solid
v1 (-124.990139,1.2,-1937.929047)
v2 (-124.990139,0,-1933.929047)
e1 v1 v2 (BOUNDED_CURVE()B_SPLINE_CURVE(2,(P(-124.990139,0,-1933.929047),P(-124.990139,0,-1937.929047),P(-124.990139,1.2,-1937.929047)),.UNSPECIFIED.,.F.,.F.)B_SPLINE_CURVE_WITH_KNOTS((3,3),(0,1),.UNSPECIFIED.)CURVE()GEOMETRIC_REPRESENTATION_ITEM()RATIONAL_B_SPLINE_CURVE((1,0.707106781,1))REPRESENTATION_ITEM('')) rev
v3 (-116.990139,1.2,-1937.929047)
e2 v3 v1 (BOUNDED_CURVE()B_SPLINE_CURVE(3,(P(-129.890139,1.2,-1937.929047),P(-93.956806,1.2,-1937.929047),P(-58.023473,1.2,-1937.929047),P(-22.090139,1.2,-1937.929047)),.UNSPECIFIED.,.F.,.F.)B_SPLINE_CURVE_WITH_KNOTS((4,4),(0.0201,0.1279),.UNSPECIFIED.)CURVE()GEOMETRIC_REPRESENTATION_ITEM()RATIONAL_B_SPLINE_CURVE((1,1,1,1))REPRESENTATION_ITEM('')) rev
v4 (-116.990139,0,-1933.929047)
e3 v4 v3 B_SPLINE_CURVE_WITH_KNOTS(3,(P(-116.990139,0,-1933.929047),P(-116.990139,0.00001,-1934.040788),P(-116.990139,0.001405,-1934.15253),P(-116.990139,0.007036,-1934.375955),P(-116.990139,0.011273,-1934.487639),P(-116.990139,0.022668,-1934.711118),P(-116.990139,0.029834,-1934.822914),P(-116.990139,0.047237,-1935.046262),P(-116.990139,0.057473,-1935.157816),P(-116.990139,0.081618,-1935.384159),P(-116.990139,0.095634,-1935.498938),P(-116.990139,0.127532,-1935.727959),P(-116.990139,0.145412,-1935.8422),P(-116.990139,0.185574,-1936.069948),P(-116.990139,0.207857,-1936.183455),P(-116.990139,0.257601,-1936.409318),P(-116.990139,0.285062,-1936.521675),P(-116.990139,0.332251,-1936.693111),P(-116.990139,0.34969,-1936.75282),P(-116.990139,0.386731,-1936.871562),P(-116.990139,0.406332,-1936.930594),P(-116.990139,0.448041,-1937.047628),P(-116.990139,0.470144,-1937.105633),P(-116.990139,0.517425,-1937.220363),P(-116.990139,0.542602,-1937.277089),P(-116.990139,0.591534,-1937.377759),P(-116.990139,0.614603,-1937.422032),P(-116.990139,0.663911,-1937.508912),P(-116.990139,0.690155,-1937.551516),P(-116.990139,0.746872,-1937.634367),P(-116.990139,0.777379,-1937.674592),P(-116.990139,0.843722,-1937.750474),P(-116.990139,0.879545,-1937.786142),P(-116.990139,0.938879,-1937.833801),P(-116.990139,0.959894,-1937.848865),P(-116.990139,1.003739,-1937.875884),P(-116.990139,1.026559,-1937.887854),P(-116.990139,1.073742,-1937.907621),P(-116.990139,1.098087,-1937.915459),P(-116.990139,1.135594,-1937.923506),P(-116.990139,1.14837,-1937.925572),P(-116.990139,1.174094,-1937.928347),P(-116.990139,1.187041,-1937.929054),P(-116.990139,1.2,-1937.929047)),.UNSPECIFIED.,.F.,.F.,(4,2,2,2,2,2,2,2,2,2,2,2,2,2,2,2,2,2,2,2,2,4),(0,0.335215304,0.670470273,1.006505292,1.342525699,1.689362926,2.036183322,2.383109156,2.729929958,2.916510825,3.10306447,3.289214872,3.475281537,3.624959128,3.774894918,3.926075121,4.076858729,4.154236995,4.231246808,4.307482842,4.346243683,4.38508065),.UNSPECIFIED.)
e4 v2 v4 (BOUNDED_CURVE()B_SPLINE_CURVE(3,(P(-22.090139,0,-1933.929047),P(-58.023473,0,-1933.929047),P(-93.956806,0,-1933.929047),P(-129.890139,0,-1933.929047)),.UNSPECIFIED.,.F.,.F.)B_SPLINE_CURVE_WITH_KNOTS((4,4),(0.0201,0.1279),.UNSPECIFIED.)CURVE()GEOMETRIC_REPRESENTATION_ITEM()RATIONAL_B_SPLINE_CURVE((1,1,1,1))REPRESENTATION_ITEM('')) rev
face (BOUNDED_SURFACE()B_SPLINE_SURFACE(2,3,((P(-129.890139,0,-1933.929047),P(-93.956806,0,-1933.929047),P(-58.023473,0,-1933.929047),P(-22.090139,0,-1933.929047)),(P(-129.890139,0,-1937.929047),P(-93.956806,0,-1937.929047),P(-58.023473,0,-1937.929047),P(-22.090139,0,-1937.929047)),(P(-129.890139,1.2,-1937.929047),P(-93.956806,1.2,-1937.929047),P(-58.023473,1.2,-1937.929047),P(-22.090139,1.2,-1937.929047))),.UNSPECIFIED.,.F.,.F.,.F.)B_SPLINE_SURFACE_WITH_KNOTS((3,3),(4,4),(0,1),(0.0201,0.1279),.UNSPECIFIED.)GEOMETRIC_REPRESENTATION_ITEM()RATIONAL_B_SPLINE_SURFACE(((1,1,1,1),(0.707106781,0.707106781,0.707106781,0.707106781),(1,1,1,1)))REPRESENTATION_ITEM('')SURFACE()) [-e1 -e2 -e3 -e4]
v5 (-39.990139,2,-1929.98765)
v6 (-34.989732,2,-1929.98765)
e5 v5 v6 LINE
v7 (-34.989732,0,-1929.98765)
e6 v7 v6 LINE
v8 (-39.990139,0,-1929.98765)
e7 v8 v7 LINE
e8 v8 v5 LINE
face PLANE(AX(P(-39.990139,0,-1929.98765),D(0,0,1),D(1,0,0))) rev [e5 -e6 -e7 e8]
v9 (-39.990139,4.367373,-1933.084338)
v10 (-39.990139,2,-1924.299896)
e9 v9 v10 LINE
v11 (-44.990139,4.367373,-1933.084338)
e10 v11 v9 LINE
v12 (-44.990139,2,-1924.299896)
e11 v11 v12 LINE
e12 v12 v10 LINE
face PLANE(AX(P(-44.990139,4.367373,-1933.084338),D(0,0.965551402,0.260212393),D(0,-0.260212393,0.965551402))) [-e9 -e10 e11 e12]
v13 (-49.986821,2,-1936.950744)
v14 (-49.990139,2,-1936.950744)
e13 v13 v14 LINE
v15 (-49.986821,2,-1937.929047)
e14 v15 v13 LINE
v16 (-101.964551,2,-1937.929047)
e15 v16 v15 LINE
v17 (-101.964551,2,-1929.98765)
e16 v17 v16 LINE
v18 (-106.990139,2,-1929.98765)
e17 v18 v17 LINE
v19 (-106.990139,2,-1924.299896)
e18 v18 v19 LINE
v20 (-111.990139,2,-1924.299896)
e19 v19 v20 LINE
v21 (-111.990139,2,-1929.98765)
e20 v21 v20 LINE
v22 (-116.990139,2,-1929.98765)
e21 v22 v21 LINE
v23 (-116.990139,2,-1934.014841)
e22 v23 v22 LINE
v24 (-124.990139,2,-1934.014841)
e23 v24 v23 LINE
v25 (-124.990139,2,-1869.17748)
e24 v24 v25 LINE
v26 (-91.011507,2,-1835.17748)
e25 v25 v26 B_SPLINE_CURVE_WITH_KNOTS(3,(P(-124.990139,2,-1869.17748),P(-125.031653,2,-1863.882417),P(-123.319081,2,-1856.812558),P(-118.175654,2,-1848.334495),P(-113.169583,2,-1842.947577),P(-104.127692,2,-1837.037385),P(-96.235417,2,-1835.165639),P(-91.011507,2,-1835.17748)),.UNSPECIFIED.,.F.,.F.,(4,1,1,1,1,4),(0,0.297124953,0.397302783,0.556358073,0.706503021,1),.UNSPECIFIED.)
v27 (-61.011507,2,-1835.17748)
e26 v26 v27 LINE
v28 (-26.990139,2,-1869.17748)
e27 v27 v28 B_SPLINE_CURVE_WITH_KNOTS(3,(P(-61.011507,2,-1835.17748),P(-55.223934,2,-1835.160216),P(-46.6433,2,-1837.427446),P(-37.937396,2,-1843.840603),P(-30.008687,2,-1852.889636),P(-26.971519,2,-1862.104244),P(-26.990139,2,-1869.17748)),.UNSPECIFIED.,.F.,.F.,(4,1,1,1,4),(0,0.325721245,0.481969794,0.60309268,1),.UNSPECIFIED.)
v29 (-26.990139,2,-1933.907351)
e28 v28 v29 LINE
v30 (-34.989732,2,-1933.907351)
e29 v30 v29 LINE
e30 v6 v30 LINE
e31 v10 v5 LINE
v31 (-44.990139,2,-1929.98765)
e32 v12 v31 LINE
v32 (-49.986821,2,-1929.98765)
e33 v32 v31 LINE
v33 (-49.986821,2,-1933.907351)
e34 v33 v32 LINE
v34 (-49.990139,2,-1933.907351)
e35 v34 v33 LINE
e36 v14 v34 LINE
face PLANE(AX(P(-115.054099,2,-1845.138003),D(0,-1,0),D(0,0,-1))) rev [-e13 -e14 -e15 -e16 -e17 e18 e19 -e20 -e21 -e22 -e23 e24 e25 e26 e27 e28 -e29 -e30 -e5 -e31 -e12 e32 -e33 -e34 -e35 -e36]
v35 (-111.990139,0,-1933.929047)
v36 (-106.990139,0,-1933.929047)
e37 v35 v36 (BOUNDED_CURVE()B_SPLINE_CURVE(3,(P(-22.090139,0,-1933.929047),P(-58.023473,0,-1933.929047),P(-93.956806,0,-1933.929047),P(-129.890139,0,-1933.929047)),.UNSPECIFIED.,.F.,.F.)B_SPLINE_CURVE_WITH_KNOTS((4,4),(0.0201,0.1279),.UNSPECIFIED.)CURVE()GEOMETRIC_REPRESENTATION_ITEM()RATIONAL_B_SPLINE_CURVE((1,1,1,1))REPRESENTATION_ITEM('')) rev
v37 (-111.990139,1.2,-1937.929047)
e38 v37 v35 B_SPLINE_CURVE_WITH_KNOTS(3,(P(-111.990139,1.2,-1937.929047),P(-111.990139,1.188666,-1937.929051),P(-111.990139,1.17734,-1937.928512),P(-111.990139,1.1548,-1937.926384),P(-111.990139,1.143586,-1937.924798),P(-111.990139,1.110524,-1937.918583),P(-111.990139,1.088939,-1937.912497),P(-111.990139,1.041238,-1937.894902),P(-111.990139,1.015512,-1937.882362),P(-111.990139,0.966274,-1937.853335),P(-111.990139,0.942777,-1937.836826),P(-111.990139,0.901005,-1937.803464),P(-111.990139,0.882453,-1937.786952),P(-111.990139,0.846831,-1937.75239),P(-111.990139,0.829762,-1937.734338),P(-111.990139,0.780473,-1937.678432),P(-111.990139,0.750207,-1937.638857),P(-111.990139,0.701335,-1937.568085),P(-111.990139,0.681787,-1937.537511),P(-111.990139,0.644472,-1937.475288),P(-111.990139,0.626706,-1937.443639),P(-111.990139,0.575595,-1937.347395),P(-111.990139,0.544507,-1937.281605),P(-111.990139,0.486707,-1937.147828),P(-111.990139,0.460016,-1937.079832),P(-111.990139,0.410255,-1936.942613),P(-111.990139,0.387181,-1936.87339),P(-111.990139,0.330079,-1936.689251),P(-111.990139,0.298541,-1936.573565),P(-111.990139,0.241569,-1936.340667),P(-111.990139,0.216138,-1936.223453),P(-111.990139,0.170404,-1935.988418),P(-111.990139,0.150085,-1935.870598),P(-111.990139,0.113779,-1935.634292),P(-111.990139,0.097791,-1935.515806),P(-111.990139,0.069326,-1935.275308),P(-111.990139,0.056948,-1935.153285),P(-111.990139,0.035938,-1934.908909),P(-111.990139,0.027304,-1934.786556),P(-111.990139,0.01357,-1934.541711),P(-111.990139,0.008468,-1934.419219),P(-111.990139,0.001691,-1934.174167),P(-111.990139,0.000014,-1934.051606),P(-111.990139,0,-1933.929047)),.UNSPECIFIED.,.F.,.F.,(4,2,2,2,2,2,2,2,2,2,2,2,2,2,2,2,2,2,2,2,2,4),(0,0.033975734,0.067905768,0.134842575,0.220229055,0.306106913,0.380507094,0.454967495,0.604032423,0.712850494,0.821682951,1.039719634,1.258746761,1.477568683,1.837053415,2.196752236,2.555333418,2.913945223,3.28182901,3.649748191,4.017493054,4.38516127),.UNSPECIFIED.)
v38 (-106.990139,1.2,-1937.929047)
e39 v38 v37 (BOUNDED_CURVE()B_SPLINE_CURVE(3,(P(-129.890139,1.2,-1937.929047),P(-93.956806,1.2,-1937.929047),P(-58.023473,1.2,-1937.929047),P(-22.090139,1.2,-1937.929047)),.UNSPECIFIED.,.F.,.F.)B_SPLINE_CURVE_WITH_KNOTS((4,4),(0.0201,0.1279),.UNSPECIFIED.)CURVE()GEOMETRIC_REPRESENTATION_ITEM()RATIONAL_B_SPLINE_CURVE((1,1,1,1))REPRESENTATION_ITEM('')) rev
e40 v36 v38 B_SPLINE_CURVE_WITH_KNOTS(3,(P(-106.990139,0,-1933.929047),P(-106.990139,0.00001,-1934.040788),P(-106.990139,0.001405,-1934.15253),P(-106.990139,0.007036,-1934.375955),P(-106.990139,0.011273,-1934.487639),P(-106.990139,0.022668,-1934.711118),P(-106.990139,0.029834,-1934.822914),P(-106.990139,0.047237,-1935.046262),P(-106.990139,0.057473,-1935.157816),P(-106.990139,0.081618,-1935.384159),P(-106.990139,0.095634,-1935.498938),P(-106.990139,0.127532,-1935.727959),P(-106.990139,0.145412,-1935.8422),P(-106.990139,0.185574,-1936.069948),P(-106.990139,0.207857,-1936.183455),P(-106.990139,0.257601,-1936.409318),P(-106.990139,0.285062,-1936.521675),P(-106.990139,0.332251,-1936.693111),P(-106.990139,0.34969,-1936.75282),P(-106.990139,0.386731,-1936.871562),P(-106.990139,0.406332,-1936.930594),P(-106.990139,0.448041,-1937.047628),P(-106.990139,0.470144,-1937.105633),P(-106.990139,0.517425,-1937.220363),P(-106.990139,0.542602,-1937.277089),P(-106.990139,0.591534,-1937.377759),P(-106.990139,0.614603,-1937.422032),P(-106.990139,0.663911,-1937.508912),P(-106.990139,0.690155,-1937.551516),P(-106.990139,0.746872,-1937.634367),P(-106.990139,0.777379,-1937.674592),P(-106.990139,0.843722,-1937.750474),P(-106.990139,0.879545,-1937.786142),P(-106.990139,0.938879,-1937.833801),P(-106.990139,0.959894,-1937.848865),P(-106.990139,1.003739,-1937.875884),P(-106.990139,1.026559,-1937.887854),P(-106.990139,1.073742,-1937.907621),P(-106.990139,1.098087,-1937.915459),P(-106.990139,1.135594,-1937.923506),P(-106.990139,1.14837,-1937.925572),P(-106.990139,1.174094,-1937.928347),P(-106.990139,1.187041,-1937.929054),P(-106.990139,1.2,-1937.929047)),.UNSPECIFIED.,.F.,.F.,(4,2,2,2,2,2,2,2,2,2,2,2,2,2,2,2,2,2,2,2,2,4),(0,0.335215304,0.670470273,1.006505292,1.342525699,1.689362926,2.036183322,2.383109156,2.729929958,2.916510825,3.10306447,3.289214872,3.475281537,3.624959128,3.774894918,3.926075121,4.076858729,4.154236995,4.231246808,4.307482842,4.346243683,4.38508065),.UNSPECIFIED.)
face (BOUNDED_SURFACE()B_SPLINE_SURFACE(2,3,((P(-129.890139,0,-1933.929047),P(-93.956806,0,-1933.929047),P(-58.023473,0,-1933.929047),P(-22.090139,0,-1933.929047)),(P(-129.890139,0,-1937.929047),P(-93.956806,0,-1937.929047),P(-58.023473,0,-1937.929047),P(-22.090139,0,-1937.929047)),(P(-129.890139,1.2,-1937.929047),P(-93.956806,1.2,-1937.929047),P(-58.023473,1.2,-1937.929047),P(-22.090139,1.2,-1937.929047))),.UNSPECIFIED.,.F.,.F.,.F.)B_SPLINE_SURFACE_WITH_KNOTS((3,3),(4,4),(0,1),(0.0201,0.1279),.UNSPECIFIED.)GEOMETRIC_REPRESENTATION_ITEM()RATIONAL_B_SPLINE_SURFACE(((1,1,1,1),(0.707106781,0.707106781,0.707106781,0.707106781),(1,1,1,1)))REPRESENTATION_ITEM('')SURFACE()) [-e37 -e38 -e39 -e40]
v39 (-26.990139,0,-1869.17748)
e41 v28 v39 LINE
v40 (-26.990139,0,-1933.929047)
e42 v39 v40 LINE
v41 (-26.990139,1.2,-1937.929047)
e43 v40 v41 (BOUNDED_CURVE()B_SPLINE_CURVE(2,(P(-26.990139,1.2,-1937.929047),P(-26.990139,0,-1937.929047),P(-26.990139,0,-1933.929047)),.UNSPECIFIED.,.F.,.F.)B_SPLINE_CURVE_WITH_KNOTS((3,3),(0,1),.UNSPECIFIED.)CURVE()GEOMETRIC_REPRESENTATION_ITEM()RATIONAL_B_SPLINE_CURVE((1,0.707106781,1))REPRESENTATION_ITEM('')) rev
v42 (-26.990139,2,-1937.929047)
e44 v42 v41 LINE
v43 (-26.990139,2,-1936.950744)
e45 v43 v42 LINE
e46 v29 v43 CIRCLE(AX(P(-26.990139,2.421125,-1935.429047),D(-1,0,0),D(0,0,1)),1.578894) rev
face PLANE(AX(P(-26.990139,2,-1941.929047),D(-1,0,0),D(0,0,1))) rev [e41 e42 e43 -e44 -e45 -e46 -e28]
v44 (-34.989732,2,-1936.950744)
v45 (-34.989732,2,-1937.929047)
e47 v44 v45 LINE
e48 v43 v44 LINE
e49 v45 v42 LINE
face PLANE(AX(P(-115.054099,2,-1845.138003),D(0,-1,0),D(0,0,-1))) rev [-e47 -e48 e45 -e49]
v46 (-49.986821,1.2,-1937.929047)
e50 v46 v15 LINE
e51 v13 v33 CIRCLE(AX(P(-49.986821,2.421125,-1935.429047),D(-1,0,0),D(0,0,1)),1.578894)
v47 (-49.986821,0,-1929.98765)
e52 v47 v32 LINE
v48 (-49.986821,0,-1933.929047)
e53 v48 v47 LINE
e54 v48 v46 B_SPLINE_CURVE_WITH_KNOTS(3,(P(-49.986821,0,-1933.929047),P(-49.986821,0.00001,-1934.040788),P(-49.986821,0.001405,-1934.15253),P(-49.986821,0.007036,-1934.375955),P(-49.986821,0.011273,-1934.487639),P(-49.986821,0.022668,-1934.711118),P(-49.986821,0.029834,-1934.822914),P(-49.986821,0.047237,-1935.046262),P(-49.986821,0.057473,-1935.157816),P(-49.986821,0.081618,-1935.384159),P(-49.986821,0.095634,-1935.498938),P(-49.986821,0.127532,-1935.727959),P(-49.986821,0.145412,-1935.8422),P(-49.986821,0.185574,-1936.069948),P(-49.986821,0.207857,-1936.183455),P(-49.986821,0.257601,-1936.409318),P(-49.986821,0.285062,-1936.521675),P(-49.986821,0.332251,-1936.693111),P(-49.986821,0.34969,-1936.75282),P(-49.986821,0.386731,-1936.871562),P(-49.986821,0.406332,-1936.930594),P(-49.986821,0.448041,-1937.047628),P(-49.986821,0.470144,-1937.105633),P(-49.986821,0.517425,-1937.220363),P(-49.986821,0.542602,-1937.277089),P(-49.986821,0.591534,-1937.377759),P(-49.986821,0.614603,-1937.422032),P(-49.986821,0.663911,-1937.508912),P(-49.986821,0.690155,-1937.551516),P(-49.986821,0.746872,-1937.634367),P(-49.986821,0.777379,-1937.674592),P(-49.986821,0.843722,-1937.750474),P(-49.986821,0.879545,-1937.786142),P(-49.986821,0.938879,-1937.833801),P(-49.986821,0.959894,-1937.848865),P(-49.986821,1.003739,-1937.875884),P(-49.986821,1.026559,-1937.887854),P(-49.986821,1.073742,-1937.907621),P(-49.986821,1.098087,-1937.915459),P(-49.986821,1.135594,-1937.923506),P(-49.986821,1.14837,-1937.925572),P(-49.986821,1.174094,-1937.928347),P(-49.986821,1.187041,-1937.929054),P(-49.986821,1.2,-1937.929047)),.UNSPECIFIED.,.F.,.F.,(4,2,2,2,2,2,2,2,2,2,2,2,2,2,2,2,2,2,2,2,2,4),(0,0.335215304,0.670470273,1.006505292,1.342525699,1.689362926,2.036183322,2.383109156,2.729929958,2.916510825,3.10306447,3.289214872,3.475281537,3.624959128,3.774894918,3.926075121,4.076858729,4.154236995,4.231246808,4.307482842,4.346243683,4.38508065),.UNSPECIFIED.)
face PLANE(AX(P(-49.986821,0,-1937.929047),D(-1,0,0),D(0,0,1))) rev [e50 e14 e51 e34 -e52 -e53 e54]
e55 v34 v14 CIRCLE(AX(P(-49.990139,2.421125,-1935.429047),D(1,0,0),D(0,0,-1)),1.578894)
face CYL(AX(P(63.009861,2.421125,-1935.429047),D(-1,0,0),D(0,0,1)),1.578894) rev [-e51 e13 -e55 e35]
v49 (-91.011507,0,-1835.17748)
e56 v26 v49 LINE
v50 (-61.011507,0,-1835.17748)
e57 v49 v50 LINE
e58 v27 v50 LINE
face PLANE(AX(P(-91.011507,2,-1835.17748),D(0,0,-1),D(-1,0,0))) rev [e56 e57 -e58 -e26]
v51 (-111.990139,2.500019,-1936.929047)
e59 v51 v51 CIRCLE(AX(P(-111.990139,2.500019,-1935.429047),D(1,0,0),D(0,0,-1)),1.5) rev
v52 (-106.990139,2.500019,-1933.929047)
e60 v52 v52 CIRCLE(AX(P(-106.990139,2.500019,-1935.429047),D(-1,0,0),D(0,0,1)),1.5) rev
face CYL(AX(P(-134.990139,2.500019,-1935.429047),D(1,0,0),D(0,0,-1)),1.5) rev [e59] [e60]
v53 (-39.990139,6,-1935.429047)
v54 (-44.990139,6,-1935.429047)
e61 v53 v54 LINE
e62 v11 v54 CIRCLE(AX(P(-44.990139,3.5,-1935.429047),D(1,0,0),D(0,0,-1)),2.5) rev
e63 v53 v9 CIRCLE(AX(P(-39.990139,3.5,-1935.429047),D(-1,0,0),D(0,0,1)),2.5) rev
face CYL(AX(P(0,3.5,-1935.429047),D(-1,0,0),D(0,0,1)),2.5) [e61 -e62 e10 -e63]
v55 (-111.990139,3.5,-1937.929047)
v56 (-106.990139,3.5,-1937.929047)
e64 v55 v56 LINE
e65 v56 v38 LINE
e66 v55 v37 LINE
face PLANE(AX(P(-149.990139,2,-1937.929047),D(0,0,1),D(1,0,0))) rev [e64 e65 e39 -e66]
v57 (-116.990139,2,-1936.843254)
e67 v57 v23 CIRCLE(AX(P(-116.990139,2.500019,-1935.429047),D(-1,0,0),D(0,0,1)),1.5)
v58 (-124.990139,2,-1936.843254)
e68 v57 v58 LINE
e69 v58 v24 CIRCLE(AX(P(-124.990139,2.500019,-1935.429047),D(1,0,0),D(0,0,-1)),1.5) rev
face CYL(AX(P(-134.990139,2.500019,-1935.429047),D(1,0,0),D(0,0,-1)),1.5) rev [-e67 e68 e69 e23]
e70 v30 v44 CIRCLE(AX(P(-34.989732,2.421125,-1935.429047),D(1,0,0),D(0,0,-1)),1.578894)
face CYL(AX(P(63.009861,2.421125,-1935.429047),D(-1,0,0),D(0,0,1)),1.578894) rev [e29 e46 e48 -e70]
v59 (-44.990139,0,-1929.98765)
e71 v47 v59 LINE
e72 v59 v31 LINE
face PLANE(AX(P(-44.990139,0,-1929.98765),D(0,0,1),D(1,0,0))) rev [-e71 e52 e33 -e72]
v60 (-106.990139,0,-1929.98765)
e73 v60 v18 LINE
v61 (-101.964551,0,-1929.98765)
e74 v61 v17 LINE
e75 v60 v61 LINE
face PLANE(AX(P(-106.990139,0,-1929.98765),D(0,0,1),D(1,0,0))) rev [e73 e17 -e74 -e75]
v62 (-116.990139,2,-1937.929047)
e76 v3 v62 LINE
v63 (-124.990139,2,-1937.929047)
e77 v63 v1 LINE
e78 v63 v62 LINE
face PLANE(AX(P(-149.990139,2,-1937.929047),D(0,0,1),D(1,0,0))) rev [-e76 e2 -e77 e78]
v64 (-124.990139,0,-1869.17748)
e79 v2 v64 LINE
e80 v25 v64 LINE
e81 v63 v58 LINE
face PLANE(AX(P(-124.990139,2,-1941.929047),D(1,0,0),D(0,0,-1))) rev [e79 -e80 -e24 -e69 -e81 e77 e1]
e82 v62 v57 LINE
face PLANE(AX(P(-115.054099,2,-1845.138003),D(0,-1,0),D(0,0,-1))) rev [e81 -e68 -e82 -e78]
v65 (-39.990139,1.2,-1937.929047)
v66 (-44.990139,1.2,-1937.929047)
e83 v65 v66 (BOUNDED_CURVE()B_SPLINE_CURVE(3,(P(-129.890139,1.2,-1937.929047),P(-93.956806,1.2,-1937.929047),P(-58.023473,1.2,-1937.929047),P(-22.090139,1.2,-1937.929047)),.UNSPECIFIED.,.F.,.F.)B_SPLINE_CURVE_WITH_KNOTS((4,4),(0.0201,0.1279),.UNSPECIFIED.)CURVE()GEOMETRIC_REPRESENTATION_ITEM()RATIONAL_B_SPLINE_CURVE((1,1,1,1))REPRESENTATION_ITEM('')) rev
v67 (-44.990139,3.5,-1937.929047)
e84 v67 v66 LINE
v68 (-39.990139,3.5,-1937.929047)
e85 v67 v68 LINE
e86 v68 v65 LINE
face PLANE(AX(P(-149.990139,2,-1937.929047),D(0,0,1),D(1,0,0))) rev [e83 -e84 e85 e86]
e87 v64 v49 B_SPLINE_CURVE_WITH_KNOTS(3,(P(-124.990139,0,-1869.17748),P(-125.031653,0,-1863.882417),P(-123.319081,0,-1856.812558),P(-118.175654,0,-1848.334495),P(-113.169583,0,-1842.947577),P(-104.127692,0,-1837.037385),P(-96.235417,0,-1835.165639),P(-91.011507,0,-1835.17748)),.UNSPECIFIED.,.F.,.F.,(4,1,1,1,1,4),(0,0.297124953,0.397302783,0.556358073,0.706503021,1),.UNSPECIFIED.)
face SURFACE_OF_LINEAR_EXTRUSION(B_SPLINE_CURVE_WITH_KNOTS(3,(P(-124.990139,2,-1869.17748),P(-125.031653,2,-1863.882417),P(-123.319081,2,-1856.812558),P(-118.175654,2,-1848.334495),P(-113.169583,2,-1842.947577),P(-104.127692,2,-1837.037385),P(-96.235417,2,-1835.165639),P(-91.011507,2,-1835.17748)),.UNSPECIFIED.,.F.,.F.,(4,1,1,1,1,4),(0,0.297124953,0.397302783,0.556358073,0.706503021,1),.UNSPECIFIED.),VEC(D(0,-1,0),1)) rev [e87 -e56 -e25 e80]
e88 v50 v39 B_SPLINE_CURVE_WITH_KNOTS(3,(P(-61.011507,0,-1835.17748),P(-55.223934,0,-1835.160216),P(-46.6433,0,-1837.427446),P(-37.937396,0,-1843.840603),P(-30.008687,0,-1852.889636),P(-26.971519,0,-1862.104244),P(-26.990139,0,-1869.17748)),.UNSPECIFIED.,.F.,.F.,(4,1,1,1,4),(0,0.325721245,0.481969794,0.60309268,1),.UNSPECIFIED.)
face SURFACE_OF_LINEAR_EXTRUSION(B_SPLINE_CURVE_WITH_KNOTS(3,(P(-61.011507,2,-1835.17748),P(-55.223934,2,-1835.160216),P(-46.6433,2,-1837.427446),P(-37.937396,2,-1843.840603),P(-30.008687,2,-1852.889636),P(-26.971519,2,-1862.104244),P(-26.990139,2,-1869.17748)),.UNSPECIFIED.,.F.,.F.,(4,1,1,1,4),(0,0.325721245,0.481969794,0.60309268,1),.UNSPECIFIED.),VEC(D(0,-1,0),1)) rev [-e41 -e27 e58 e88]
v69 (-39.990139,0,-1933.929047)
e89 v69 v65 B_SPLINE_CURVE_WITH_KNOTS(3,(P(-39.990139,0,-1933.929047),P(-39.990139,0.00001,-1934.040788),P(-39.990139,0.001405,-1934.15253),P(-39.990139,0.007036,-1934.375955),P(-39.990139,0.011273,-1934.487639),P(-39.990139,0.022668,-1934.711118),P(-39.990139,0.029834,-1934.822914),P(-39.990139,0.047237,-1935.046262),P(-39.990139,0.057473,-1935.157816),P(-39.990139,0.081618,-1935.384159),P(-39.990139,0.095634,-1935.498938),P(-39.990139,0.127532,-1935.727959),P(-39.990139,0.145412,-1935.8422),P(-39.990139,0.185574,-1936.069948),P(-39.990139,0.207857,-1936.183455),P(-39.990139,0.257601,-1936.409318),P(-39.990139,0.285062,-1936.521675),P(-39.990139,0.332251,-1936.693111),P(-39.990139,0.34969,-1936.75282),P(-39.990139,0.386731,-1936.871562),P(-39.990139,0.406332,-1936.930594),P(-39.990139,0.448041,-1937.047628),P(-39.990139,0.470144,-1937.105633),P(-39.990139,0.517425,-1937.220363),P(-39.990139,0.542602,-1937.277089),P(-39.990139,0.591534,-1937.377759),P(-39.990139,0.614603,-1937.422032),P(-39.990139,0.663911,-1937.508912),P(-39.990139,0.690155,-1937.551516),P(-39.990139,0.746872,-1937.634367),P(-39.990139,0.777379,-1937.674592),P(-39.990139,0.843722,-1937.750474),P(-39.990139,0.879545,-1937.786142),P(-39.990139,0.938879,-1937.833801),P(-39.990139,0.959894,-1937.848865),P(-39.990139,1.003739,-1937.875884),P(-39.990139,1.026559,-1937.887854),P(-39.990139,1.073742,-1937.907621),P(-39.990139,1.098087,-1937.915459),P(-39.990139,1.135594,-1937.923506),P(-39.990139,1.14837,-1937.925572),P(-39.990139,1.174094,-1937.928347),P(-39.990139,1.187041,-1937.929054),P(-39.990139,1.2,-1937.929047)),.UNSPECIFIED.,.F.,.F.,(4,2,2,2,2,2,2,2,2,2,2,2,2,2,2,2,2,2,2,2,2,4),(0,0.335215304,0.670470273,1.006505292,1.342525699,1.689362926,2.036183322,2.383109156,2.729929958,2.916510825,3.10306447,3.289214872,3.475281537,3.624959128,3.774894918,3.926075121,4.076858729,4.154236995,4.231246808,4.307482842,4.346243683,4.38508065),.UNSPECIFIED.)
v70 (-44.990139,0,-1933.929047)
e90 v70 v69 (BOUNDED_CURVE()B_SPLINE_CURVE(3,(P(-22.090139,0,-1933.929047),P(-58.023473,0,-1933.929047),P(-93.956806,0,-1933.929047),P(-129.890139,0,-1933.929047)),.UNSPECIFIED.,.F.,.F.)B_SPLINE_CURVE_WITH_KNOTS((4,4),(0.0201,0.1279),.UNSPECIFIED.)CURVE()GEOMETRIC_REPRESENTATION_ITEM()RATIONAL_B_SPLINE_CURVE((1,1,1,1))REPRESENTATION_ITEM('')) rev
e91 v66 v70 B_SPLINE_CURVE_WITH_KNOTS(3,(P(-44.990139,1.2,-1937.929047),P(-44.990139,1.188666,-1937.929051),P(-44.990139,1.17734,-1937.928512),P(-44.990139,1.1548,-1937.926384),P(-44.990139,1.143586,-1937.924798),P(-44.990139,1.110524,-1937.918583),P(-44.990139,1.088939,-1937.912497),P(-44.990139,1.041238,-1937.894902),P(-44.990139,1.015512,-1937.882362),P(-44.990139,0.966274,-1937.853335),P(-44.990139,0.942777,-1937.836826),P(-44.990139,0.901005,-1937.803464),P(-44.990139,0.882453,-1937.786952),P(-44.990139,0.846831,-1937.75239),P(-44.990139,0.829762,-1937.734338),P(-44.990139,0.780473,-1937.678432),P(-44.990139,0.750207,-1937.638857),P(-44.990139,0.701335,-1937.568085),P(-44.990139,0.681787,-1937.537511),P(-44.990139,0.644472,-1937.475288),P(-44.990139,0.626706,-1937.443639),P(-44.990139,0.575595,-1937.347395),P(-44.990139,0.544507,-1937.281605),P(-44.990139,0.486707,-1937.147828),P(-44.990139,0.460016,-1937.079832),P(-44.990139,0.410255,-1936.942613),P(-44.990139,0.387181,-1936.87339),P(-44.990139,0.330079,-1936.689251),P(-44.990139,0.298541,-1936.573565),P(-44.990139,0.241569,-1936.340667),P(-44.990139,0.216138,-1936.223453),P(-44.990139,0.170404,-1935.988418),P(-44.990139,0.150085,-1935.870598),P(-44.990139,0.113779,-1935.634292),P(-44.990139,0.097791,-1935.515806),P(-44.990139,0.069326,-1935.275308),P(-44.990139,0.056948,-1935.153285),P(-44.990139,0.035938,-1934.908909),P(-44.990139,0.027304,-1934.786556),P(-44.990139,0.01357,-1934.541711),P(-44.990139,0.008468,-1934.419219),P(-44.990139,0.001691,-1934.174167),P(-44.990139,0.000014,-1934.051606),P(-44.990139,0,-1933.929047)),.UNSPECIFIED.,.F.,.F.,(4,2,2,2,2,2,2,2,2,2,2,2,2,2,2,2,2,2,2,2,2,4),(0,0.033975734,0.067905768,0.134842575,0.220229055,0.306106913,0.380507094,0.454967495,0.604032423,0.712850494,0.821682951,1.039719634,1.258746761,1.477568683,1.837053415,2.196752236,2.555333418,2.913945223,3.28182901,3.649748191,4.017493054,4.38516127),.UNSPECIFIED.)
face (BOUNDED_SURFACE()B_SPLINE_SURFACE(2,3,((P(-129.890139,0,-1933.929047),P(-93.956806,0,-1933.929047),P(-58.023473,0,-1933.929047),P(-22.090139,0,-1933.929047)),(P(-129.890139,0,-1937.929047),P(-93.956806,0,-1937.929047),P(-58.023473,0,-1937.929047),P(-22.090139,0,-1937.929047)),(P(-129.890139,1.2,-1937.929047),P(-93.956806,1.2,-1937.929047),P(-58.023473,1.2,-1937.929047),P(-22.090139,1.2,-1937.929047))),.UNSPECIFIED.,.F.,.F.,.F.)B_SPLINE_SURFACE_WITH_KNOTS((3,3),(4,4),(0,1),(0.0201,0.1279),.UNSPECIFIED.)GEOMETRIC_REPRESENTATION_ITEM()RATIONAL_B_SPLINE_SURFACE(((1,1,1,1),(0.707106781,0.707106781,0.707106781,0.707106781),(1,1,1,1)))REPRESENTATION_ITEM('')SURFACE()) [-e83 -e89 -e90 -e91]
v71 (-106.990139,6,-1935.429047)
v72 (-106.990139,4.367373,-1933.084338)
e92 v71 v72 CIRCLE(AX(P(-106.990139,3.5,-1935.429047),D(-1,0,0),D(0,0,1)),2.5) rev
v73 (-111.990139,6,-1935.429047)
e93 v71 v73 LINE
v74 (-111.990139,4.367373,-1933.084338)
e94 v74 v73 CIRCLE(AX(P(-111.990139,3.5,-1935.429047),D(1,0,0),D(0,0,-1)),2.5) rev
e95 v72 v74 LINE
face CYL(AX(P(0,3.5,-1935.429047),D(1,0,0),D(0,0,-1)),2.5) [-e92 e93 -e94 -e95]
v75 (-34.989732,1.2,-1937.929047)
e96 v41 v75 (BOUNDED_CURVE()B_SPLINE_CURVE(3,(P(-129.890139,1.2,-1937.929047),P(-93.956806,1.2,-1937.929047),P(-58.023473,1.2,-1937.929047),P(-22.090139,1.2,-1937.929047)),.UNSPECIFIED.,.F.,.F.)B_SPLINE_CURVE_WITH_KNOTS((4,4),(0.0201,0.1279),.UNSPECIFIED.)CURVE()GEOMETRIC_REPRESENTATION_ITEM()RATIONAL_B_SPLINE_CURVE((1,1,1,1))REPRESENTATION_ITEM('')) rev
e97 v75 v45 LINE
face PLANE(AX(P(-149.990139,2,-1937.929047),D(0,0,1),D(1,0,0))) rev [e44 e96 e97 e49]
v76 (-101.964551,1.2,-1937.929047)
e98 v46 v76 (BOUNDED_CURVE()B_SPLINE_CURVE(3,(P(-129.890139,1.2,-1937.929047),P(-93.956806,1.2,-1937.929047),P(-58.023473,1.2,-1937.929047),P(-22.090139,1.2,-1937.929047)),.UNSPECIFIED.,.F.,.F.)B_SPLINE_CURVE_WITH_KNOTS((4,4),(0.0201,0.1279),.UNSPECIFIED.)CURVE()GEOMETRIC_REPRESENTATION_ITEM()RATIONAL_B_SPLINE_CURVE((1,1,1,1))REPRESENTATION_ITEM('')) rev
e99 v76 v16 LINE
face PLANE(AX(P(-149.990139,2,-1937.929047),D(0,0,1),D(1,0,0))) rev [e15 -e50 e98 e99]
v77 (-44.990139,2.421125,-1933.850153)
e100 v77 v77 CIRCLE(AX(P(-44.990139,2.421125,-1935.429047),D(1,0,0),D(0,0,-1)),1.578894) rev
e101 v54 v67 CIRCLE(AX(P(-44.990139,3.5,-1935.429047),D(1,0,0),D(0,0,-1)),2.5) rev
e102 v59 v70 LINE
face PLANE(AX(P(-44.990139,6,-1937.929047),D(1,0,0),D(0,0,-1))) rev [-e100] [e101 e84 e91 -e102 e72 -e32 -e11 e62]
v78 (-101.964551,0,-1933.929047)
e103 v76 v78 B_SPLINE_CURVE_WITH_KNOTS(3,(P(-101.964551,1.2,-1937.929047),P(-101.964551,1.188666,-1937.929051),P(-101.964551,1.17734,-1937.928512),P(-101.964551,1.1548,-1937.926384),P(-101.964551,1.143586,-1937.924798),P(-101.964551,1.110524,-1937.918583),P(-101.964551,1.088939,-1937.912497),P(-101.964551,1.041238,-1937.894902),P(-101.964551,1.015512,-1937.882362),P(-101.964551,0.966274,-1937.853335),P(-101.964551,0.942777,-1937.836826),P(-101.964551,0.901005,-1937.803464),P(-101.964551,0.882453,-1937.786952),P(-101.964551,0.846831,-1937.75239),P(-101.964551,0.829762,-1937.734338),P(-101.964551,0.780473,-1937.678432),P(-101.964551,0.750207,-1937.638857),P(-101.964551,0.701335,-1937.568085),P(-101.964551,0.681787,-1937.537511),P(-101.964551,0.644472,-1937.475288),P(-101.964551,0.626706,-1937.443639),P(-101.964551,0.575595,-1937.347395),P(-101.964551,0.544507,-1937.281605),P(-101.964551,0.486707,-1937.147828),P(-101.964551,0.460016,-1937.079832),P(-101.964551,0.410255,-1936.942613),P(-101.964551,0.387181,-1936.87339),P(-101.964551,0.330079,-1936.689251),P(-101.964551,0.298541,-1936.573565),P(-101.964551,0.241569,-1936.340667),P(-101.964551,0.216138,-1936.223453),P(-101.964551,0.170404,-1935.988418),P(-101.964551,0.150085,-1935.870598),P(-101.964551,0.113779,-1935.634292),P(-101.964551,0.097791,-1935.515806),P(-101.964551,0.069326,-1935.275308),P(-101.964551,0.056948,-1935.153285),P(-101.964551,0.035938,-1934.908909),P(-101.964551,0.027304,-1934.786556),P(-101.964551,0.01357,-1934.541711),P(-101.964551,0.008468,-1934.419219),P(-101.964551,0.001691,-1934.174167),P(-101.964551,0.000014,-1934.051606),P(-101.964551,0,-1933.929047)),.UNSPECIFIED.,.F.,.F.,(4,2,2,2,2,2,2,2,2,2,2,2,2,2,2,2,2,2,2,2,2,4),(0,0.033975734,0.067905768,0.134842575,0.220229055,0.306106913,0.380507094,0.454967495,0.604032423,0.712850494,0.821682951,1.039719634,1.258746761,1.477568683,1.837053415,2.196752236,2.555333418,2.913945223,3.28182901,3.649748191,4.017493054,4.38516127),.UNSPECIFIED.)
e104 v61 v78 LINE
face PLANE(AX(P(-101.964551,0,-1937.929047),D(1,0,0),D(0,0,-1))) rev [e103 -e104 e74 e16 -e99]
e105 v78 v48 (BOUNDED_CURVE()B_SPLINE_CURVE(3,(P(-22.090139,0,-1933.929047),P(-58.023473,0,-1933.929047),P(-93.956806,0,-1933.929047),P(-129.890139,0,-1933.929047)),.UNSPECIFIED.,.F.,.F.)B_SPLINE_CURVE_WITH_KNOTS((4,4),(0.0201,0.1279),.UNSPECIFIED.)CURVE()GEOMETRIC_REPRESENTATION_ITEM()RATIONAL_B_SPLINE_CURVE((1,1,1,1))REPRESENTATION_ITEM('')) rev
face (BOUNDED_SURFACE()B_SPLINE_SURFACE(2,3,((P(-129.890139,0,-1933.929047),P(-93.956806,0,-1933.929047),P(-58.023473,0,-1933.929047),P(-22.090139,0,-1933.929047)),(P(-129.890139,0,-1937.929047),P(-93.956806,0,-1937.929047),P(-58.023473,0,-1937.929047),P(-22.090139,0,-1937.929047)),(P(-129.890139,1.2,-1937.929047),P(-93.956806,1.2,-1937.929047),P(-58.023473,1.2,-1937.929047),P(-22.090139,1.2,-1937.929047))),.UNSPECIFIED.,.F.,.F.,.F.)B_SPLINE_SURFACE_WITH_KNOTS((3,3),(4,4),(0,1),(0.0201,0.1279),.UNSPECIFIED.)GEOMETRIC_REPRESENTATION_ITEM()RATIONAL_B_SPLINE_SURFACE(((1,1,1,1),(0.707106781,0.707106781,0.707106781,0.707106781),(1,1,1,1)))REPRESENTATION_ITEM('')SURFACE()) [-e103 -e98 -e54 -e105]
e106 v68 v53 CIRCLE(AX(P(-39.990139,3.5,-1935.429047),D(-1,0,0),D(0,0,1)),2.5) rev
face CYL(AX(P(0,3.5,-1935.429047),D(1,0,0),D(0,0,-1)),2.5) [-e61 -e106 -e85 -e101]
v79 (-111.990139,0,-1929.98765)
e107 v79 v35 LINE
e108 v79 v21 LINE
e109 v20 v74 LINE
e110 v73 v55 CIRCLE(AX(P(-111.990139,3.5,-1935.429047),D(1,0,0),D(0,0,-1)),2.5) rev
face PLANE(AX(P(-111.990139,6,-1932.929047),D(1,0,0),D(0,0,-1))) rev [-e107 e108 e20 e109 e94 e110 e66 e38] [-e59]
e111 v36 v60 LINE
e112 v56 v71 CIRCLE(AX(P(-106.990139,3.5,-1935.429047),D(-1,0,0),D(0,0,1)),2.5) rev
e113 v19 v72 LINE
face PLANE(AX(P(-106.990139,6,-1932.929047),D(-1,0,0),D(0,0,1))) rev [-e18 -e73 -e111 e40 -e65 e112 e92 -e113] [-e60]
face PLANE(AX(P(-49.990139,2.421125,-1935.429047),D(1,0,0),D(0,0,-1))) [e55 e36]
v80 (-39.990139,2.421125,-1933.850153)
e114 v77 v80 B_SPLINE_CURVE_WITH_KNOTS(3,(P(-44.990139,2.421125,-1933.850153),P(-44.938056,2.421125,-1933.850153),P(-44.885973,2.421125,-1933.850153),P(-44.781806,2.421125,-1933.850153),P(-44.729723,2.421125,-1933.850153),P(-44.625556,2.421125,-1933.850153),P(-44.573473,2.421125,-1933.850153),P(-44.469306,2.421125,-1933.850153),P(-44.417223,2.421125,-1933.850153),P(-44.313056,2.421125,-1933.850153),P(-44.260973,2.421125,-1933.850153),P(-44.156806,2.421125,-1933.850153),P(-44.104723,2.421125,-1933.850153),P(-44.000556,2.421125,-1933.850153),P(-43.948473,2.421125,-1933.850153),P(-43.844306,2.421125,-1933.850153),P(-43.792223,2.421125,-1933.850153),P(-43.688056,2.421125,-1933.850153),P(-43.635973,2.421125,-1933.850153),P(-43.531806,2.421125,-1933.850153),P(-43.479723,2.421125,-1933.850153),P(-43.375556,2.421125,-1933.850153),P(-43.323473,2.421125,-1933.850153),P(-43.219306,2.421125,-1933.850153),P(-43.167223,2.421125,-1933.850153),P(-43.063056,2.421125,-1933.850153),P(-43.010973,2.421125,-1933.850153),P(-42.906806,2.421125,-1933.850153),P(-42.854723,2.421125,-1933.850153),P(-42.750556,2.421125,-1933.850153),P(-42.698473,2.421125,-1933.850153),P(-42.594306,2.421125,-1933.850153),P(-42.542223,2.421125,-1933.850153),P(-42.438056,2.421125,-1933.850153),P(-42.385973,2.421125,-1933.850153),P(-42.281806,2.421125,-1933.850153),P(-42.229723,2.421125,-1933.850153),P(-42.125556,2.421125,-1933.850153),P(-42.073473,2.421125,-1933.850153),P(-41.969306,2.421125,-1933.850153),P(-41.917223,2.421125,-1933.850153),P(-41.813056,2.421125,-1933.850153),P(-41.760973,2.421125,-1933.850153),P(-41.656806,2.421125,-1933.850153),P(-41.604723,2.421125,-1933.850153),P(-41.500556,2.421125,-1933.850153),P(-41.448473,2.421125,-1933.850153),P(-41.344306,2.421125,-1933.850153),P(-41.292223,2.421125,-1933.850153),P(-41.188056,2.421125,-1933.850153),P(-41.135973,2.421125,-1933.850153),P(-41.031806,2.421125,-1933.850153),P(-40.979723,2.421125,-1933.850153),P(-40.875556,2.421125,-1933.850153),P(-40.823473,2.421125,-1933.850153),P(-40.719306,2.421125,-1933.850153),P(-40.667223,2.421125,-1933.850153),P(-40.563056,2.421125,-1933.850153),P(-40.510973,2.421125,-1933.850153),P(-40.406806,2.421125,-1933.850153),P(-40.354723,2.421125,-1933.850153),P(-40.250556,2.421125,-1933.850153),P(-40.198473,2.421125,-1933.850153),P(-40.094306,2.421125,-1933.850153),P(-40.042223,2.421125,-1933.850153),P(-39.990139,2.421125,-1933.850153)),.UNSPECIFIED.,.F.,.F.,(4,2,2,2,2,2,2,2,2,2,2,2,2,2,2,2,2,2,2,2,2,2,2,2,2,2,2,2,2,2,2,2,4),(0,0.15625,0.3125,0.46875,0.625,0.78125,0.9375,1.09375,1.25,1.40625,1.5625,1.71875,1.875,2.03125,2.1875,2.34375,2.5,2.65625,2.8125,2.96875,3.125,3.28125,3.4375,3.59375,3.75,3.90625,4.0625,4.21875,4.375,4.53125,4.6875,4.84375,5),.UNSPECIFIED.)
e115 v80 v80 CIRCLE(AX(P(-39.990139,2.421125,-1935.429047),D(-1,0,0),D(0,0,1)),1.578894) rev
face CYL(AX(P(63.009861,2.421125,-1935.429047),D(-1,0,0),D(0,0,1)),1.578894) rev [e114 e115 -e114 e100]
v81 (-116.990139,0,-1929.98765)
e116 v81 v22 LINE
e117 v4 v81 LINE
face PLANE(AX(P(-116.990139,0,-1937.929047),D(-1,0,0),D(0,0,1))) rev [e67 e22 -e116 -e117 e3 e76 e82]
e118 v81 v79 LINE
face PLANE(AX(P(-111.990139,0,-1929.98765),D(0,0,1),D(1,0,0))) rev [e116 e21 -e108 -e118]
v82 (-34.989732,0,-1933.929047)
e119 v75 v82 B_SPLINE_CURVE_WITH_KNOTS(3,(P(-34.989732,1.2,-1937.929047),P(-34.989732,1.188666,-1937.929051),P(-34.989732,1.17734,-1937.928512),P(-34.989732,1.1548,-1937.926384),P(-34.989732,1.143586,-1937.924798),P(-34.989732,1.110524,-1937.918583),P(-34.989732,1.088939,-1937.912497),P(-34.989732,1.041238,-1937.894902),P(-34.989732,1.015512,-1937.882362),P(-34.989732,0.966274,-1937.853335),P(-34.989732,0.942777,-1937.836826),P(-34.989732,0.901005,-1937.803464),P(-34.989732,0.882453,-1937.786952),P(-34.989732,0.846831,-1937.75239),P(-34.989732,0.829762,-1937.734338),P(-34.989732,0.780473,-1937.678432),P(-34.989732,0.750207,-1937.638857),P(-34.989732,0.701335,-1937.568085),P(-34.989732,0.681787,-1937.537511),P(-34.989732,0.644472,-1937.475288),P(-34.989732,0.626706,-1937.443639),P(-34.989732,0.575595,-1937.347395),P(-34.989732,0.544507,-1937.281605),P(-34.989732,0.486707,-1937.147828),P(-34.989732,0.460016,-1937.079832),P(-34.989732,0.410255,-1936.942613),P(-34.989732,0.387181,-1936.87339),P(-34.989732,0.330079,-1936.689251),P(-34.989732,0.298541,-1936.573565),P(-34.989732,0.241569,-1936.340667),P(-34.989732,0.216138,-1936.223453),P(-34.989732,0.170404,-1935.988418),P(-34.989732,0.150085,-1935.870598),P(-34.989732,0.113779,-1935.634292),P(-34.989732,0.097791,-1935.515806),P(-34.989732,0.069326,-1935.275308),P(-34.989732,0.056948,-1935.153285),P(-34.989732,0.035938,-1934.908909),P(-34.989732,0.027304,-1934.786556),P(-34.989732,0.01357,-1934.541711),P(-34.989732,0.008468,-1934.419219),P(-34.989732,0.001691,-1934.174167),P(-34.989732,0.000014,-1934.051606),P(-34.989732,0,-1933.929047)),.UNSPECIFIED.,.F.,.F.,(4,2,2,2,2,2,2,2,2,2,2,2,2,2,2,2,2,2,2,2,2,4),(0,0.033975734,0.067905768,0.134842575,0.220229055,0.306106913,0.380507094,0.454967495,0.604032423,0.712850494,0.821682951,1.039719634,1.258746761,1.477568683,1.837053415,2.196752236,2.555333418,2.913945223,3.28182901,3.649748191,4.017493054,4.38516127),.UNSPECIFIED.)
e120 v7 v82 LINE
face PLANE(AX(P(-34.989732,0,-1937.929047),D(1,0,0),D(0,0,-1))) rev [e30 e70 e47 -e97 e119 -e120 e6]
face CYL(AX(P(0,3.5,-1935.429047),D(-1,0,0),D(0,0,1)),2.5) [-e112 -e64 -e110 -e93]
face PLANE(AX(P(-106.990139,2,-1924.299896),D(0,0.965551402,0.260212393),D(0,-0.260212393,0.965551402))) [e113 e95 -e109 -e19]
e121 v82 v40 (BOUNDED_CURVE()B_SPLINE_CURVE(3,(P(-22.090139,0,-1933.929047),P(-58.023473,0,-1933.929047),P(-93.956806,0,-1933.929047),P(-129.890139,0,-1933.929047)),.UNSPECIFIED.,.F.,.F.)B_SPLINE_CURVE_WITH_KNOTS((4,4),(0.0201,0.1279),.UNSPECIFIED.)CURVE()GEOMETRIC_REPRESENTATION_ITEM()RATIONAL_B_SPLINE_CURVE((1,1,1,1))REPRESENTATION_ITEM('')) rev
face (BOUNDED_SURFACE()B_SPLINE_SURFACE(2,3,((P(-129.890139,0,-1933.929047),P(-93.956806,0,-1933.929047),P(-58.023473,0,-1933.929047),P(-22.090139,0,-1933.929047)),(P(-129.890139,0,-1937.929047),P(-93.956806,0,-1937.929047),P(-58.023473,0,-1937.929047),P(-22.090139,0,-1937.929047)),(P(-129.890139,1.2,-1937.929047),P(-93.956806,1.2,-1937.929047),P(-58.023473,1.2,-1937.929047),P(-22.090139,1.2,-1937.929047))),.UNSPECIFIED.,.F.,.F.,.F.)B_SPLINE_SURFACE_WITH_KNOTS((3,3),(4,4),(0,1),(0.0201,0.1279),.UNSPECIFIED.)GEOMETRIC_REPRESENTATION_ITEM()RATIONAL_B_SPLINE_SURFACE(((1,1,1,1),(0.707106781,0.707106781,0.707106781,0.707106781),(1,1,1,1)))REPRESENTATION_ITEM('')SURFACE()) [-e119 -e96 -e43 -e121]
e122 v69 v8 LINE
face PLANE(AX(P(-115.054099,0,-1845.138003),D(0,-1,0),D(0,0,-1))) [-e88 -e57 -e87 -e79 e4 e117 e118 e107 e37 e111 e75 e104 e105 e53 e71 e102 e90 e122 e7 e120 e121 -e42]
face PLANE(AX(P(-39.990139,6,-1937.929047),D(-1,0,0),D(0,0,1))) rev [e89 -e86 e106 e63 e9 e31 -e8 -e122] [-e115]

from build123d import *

# Parameters (mm, degrees)
BOSS_EXTRUDE1_DEPTH     = 2
SKETCH5_W               = 4
SKETCH5_H               = 2
CUT_EXTRUDE3_DEPTH      = 123
FILLET3_SIZE            = 4
FILLET3_SIZE_2          = 1.2
SKETCH6_W               = 5
SKETCH6_H               = 5
BOSS_EXTRUDE3_DEPTH     = 4
FILLET4_R               = 2.5
CUT_EXTRUDE7_DEPTH      = 23
CUT_EXTRUDE7_DEPTH_BACK = 10
SKETCH7_R               = 1.5
CUT_EXTRUDE8_DEPTH      = 103
CUT_EXTRUDE8_DEPTH_BACK = 10
SKETCH8_R               = 1.578894268
SKETCH11_W              = 5
SKETCH11_H              = 7.941397329
SKETCH11_W_2            = 5.025588604
SKETCH11_W_3            = 4.996681142
SKETCH11_W_4            = 5.000407309
CUT_EXTRUDE10_DEPTH     = 2
BOSS_EXTRUDE9_DEPTH     = 5
BOSS_EXTRUDE10_DEPTH    = 5


# Some blends are built 0.0001 mm under size
with BuildPart() as part:
    # Sketch1 → Boss-Extrude1 (new body)
    with BuildSketch(Plane(origin=(0, 0, 0), x_dir=(1, 0, 0), z_dir=(0, 1, 0))):
        with BuildLine():
            Line((-124.990139359, 1941.929047201), (-26.990139359, 1941.929047201))
            Line((-26.990139359, 1941.929047201), (-26.990139359, 1869.177480284))
            add(Edge.make_bspline(
                [(-26.990139359, 1869.177480284), (-26.971518988, 1862.10424426), (-30.008687271, 1852.889636427), (-37.937395583, 1843.840603399), (-46.643299948, 1837.427446423), (-55.223933615, 1835.160216105), (-61.011506847, 1835.177480284)],
                knots=[0, 0, 0, 0, 0.39690732, 0.518030206, 0.674278755, 1, 1, 1, 1], degree=3))
            Line((-61.011506847, 1835.177480284), (-91.011506847, 1835.177480284))
            add(Edge.make_bspline(
                [(-124.990139359, 1869.177480284), (-125.031653114, 1863.882416947), (-123.319081347, 1856.812557982), (-118.175654079, 1848.334494738), (-113.169582942, 1842.947577461), (-104.127691798, 1837.037384536), (-96.235416895, 1835.16563891), (-91.011506847, 1835.177480284)],
                knots=[0, 0, 0, 0, 0.297124953, 0.397302783, 0.556358073, 0.706503021, 1, 1, 1, 1], degree=3))
            Line((-124.990139359, 1869.177480284), (-124.990139359, 1941.929047201))
        make_face()
    extrude(amount=BOSS_EXTRUDE1_DEPTH)

    # Sketch5 → Cut-Extrude3 (cut)
    with BuildSketch(Plane(origin=(-26.990139359, 0, 0), x_dir=(0, 0, -1), z_dir=(1, 0, 0))):
        with Locations((1939.929047201, 1)):
            Rectangle(SKETCH5_W, SKETCH5_H)
    extrude(amount=-CUT_EXTRUDE3_DEPTH, mode=Mode.SUBTRACT)

    # Fillet3
    # an asymmetric fillet: 4, 1.2 mm, written as the material it takes off along each edge
    with BuildSketch(Plane(origin=(-16.990139359, 0, -1937.929047201), x_dir=(0, 0, 1), z_dir=(-1, 0, 0))) as fillet3_piece_1:
        with BuildLine():
            Bezier((FILLET3_SIZE, 0), (0, 0), (0, FILLET3_SIZE_2), weights=[1, 0.707106781, 1])
            Line((0, FILLET3_SIZE_2), (0, 0))
            Line((0, 0), (FILLET3_SIZE, 0))
        make_face()
    extrude(amount=118, mode=Mode.SUBTRACT)

    # Sketch6 → Boss-Extrude3 (add)
    with BuildSketch(Plane(origin=(0, 2, 0), x_dir=(1, 0, 0), z_dir=(0, 1, 0))):
        with Locations((-42.490139359, 1935.429047201)):
            Rectangle(SKETCH6_W, SKETCH6_H)
        with Locations((-109.490139359, 1935.429047201)):
            Rectangle(SKETCH6_W, SKETCH6_H)
    extrude(amount=BOSS_EXTRUDE3_DEPTH)

    # Fillet4
    fillet4_edges = [part.edges().sort_by_distance(p)[0] for p in [
        (-42.490139359, 6, -1932.929047201),
        (-42.490139359, 6, -1937.929047201),
        (-109.490139359, 6, -1932.929047201),
        (-109.490139359, 6, -1937.929047201),
    ]]
    fillet(fillet4_edges, radius=FILLET4_R - 0.0001)  # a hair under: the kernel refuses the full size

    # Sketch7 → Cut-Extrude7 (cut, two sides: drawn at the far end of the back side and taken through both)
    with BuildSketch(Plane.ZY.offset(111.990139359).offset(-CUT_EXTRUDE7_DEPTH_BACK)):
        with Locations(Location((-1935.429047201, 2.500019457, 0), (0, 0, 199.472008932))):
            Circle(SKETCH7_R)
    extrude(amount=CUT_EXTRUDE7_DEPTH + CUT_EXTRUDE7_DEPTH_BACK, mode=Mode.SUBTRACT)

    # Sketch8 → Cut-Extrude8 (cut, two sides: drawn at the far end of the back side and taken through both)
    with BuildSketch(Plane(origin=(-39.990139359, 0, 0), x_dir=(0, 0, -1), z_dir=(1, 0, 0)).offset(-CUT_EXTRUDE8_DEPTH_BACK)):
        with Locations(Location((1935.429047201, 2.421125189, 0), (0, 0, 195.469275058))):
            Circle(SKETCH8_R)
    extrude(amount=CUT_EXTRUDE8_DEPTH + CUT_EXTRUDE8_DEPTH_BACK, mode=Mode.SUBTRACT)

    # Sketch11 → Cut-Extrude10 (cut)
    with BuildSketch(Plane(origin=(0, 2, 0), x_dir=(1, 0, 0), z_dir=(0, 1, 0))):
        with Locations((-114.490139359, 1933.958348537)):
            Rectangle(SKETCH11_W, SKETCH11_H)
        with Locations((-104.477345057, 1933.958348537)):
            Rectangle(SKETCH11_W_2, SKETCH11_H)
        with Locations((-47.48847993, 1933.958348537)):
            Rectangle(SKETCH11_W_3, SKETCH11_H)
        with Locations((-37.489935704, 1933.958348537)):
            Rectangle(SKETCH11_W_4, SKETCH11_H)
    extrude(amount=-CUT_EXTRUDE10_DEPTH, mode=Mode.SUBTRACT)

    # Sketch12 → Boss-Extrude9 (add)
    with BuildSketch(Plane.ZY.offset(111.990139359)):
        with BuildLine():
            Line((-1924.299895593, 2), (-1934.170448036, 4.660075958))
            add(Edge.make_bspline(
                [(-1934.170448036, 4.660075958), (-1933.941696195, 4.343587233), (-1933.419980381, 3.982722954), (-1933.044506849, 2.985103355), (-1932.921466188, 2.346520539), (-1933.020256273, 1.890017898)],
                knots=[0, 0, 0, 0, 0.374528061, 0.57386245, 1, 1, 1, 1], degree=3))
            Line((-1933.020256273, 1.890017898), (-1924.299895593, 2))
        make_face()
    extrude(amount=-BOSS_EXTRUDE9_DEPTH)

    # Sketch13 → Boss-Extrude10 (add)
    with BuildSketch(Plane(origin=(-39.990139359, 0, 0), x_dir=(0, 0, -1), z_dir=(1, 0, 0))):
        Polygon((1933.084337522, 4.367373347), (1924.299895593, 2), (1933.057886548, 2), (1933.341968005, 3.330037979), (1934.06795395, 4.267766953), (1934.612443409, 4.7319029), align=None)
    extrude(amount=-BOSS_EXTRUDE10_DEPTH)


solid = part.part
